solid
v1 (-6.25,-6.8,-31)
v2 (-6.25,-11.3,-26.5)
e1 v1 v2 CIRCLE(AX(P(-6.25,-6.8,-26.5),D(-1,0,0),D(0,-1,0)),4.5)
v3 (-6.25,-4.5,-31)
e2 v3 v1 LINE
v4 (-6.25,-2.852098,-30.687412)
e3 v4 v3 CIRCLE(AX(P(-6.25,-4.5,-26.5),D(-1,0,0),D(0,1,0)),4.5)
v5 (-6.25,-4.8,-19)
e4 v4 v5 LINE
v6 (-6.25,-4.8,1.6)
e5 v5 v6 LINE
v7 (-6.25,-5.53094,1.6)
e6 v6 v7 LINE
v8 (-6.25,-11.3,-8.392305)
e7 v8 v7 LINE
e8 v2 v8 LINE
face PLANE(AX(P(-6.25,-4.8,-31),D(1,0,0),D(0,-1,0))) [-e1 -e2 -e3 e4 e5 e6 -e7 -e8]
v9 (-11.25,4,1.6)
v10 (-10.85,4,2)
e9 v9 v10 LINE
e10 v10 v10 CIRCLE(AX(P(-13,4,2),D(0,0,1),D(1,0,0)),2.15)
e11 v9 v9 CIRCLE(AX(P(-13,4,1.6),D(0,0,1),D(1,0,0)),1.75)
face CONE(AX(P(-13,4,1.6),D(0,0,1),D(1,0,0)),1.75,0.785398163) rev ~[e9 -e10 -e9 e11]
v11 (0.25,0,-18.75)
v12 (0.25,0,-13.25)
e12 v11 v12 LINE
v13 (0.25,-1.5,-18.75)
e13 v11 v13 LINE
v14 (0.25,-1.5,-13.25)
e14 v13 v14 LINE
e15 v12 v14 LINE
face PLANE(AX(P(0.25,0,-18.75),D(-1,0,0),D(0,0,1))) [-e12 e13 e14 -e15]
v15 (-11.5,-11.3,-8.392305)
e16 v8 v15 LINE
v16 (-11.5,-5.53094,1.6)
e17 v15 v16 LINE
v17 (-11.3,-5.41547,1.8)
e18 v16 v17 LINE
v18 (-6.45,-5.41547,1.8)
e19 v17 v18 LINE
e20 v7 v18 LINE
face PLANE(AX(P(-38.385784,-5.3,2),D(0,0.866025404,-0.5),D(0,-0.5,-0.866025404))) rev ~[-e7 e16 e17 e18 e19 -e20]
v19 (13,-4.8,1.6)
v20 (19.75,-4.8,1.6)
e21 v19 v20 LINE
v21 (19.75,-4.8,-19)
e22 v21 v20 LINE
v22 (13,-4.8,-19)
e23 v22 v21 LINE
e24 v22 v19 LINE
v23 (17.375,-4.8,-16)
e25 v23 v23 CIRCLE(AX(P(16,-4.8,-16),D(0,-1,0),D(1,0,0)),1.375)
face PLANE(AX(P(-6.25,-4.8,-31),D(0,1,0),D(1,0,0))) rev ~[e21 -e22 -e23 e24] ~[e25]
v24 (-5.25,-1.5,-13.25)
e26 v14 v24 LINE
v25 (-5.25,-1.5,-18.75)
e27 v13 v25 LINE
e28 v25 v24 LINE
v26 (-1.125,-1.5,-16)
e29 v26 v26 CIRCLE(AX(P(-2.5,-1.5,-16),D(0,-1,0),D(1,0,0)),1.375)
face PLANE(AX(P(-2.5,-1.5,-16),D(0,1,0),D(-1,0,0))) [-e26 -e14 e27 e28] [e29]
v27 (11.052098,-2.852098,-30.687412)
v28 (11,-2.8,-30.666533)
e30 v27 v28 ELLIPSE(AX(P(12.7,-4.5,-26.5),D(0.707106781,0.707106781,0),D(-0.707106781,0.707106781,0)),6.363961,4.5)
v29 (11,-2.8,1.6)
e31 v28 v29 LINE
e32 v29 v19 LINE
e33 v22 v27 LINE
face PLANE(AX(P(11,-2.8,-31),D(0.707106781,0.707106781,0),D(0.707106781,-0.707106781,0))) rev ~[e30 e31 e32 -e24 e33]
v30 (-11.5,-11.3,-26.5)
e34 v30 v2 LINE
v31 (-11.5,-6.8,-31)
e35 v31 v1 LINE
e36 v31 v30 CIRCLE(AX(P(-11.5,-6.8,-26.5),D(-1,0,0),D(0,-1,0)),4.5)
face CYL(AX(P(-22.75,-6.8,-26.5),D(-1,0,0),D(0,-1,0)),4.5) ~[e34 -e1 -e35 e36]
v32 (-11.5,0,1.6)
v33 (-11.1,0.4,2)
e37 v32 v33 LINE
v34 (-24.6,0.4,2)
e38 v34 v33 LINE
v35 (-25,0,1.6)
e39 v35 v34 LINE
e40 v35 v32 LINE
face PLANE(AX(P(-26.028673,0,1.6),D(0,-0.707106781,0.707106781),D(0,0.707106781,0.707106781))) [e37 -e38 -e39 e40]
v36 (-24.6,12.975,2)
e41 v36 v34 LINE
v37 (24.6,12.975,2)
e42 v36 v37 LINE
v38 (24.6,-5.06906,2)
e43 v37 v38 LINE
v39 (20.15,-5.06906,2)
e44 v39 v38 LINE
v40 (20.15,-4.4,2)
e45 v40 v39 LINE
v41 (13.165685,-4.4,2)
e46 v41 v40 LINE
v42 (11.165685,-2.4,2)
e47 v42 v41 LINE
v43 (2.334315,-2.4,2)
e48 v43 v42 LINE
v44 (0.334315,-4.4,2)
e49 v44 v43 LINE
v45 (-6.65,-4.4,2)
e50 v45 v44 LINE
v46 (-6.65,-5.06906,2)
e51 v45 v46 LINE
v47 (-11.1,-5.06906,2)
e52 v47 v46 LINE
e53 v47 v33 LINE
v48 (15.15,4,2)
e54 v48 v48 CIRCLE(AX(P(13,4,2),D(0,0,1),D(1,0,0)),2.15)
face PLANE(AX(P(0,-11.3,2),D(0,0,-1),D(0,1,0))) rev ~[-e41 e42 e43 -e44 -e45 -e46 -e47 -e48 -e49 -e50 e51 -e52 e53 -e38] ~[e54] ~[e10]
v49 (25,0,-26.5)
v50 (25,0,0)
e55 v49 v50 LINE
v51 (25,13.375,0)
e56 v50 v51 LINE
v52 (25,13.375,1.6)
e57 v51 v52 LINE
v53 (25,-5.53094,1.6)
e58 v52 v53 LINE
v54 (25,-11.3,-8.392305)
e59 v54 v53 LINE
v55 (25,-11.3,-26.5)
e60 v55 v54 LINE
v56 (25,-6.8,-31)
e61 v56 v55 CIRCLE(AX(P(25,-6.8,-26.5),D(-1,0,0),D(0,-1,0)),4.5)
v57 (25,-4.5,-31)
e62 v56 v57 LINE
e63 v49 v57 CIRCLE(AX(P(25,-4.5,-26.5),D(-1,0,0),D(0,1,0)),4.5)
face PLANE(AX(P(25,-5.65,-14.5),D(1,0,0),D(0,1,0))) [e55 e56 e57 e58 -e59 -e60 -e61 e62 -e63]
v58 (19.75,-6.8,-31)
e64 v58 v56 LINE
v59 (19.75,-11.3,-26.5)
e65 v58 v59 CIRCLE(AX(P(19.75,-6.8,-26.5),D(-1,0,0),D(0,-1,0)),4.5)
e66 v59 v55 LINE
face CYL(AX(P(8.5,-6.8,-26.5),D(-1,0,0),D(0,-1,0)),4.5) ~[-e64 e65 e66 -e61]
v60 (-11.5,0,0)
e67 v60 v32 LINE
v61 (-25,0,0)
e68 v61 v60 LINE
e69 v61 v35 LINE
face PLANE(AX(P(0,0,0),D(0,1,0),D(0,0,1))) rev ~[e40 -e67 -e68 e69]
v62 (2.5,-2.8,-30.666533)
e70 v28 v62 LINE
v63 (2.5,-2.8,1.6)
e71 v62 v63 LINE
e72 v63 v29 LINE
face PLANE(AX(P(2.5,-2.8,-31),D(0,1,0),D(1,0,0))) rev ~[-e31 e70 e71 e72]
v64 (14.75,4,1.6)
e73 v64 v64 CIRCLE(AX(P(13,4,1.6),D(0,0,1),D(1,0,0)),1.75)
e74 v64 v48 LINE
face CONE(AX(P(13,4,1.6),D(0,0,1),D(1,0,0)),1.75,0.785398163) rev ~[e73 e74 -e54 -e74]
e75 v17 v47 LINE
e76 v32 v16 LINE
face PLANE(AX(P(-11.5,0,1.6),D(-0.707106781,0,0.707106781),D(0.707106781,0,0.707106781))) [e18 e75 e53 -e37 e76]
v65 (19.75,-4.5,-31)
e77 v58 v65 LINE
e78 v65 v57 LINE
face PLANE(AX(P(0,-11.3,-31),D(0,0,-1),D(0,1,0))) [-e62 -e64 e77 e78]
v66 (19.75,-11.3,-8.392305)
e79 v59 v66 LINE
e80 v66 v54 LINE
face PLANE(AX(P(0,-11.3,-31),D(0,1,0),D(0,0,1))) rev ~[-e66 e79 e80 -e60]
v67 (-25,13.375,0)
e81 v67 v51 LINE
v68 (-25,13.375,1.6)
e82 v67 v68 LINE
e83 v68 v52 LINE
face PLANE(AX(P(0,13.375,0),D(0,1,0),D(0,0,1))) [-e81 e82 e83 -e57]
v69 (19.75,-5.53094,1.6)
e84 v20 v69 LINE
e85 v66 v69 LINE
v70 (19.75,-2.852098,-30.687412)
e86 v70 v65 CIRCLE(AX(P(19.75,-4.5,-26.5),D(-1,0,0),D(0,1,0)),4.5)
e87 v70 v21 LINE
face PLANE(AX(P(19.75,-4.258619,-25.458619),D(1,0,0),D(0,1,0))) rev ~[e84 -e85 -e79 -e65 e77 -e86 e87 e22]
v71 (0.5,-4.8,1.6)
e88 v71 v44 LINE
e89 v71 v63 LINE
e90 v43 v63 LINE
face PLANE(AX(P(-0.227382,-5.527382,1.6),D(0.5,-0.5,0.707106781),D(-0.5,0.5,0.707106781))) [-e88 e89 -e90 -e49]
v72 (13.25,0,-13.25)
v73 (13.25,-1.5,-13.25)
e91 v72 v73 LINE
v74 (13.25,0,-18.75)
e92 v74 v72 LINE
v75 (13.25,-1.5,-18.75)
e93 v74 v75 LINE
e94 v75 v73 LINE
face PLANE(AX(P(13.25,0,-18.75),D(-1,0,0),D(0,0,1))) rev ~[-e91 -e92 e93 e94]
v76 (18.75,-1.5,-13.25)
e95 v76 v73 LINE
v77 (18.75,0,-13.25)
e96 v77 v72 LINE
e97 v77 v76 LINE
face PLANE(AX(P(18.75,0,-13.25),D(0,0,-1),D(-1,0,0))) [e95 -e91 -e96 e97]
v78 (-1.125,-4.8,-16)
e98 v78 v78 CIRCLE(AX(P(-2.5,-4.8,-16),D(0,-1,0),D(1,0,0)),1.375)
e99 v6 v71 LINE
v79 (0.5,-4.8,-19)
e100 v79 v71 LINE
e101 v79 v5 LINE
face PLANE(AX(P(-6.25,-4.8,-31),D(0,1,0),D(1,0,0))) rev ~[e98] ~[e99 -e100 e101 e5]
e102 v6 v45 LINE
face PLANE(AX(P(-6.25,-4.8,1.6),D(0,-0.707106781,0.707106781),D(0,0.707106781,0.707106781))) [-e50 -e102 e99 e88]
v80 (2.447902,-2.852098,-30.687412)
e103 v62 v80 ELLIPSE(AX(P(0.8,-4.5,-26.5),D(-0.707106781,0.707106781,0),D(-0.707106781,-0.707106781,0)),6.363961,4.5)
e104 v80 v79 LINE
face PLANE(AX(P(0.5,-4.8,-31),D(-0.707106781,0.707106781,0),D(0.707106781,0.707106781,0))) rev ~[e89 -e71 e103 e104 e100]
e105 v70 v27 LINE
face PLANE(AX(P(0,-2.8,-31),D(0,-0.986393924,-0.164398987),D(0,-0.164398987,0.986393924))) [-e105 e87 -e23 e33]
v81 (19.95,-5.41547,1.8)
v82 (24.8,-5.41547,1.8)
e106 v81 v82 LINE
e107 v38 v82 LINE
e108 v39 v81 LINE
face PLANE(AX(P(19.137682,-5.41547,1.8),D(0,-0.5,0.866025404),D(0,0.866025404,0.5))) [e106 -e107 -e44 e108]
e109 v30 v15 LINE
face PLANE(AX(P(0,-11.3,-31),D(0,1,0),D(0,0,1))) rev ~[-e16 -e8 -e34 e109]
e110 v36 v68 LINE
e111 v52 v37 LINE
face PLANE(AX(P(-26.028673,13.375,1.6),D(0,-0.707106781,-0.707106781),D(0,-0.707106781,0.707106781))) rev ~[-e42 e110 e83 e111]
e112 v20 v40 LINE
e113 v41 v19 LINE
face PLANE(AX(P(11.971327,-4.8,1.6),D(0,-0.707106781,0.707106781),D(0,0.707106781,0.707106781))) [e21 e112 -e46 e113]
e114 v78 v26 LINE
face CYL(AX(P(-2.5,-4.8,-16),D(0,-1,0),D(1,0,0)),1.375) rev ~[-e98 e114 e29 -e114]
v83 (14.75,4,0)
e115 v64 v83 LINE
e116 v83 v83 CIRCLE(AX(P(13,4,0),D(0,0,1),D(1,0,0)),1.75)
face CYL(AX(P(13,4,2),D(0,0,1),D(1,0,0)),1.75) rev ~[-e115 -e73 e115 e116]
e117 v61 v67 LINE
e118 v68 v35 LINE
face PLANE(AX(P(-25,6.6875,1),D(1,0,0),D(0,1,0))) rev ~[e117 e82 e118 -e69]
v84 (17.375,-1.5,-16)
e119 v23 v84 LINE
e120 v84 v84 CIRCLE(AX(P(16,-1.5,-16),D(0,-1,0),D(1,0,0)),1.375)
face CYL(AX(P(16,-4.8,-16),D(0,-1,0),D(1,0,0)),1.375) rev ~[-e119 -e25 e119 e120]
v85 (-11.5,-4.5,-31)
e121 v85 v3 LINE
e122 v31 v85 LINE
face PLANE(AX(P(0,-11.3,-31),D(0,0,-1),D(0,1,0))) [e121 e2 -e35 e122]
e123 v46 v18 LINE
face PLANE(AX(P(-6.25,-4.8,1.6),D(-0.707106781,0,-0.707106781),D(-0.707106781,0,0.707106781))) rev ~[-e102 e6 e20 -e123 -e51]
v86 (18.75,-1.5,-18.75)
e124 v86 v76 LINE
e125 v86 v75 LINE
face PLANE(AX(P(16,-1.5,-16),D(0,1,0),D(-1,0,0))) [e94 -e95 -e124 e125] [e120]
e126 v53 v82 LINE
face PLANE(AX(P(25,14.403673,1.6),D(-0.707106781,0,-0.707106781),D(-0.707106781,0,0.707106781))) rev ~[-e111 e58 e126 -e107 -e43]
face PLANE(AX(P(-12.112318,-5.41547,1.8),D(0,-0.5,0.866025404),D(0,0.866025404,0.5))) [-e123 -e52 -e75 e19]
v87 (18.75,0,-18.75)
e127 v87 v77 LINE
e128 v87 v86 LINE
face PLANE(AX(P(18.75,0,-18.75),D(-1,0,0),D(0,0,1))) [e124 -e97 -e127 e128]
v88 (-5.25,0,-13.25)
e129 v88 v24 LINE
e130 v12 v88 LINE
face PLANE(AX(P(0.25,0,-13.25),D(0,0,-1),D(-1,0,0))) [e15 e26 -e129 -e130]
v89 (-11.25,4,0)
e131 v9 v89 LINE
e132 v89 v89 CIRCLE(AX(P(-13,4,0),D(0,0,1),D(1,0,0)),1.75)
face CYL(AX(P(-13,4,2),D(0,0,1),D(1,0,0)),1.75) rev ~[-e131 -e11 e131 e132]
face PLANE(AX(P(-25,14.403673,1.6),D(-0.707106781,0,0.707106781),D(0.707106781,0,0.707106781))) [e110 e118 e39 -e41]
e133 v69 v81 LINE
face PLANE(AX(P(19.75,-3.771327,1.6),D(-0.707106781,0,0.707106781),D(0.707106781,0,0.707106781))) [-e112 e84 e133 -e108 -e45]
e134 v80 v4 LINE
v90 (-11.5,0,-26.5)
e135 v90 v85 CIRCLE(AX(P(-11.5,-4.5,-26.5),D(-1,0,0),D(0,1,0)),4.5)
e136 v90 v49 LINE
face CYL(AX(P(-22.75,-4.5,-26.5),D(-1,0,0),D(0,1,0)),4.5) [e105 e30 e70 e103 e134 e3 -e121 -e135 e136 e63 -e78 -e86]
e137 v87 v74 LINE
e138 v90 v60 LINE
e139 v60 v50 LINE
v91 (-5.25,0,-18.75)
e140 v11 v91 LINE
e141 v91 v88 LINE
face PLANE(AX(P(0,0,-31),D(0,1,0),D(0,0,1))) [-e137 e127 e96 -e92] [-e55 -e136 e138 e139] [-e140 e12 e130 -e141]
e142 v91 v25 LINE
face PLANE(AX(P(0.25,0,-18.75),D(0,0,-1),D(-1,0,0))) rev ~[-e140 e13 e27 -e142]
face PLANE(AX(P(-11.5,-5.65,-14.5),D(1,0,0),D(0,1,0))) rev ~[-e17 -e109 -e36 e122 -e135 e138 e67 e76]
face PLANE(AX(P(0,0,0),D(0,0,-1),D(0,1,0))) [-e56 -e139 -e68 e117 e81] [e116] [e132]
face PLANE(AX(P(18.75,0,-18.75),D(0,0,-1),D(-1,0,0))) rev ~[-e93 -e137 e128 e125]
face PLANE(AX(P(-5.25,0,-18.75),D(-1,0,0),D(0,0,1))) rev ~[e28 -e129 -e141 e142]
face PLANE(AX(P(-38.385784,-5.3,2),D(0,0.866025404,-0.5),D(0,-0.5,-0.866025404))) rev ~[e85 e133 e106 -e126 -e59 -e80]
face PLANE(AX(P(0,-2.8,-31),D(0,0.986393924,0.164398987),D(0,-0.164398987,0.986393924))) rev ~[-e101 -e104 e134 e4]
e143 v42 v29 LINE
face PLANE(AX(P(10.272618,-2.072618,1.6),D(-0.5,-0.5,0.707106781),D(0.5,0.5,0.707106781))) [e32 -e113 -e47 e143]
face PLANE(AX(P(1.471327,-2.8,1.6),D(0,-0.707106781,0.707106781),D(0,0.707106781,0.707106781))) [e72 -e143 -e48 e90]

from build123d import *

# Parameters (mm, degrees)
F0_W           = 13.375
F0_H           = 2
F1_DEPTH       = 25
F2_R           = 1.75
F3_DEPTH       = 2
F4_W           = 11.3
F4_H           = 33
F5_DEPTH       = 25
F5_DEPTH_BACK  = 11.5
F6_W           = 26
F6_H           = 6.5
F7_DEPTH       = 33
F9_DEPTH       = 33
F11_DEPTH      = 19.75
F11_DEPTH_BACK = 6.25
F12_R          = 1.375
F13_DEPTH      = 4.8
F14_W          = 5.5
F14_H          = 5.5
F15_DEPTH      = 1.5
F16_T1_DEPTH   = 27.75
F16_T3_DEPTH   = 27.75
F16_T5_DEPTH   = 59
F17_T1_DEPTH   = 59.021567647
F17_T3_DEPTH   = 59.021567647
F18_T1_DEPTH   = 6.4746360003
F18_T3_DEPTH   = 20.7323463904
F18_T5_DEPTH   = 52.0573463904
F18_T7_DEPTH   = 15.4323463904
F18_T9_DEPTH   = 14.5286731952
F18_T11_DEPTH  = 6.3286731952
F18_T13_DEPTH  = 6.4746360003
F18_T15_DEPTH  = 1.5286731952
F18_T17_DEPTH  = 7.7786731952
F18_T19_DEPTH  = 7.7786731952
F18_T24_DEPTH  = 4.8857735151
F18_T29_DEPTH  = 10.5573463904
F18_T35_DEPTH  = 4.8857735151
F18_T45_DEPTH  = 14.5286731952
F18_T49_DEPTH  = 7.3573463904
F18_T56_DEPTH  = 8.8073463904
F18_T60_DEPTH  = 2.5573463904
F18_T67_DEPTH  = 4.8857735151
F18_T71_DEPTH  = 10.5573463904
F18_T78_DEPTH  = 10.5573463904
F18_T82_DEPTH  = 4.8857735151
F18_T89_DEPTH  = 2.5573463904
F18_T93_DEPTH  = 8.8073463904


# Not quite as in the source:
# - a fillet or chamfer that OpenCascade refuses, or shapes differently, is made with other operations: its cross-section is extruded or revolved along the edge and cut away or added


with BuildPart() as f1:
    # F0 (on Right) → F1 (new body, symmetric)
    with BuildSketch(Plane.YZ):
        with Locations((6.6875, 1)):
            Rectangle(F0_W, F0_H)
    extrude(amount=F1_DEPTH, both=True)

    # F2 (on face) → F3 (cut, through all)
    with BuildSketch(Plane.XY.offset(2)):
        with Locations((-13, 4)):
            Circle(F2_R)
        with Locations((13, 4)):
            Circle(F2_R)
    extrude(amount=-F3_DEPTH, mode=Mode.SUBTRACT)

    # F4 (on Right) → F5 (join, two sides)
    with BuildSketch(Plane.YZ) as f5_sk:
        with Locations((-5.65, -14.5)):
            Rectangle(F4_W, F4_H)
    extrude(amount=F5_DEPTH)
    extrude(f5_sk.sketch, amount=-F5_DEPTH_BACK)

    # F6 (on face) → F7 (cut, through all)
    with BuildSketch(Plane(origin=(0, 0, -31), x_dir=(1, 0, 0), z_dir=(0, 0, -1))):
        with Locations((6.75, 8.05)):
            Rectangle(F6_W, F6_H)
    extrude(amount=-F7_DEPTH, mode=Mode.SUBTRACT)

    # F8 (on face) → F9 (cut, through all)
    with BuildSketch(Plane(origin=(0, 0, -31), x_dir=(1, 0, 0), z_dir=(0, 0, -1))):
        Polygon((13, 4.8), (0.5, 4.8), (2.5, 2.8), (11, 2.8), align=None)
    extrude(amount=-F9_DEPTH, mode=Mode.SUBTRACT)

    # F10 (on Right) → F11 (cut, two sides)
    with BuildSketch(Plane.YZ) as f11_sk:
        Polygon((-4.8, -31), (-2.8, -31), (-4.8, -19), align=None)
    extrude(amount=F11_DEPTH, mode=Mode.SUBTRACT)
    extrude(f11_sk.sketch, amount=-F11_DEPTH_BACK, mode=Mode.SUBTRACT)

    # F12 (on face) → F13 (cut, through all)
    with BuildSketch(Plane.XZ.offset(4.8)):
        with Locations((-2.5, -16)):
            Circle(F12_R)
        with Locations((16, -16)):
            Circle(F12_R)
    extrude(amount=-F13_DEPTH, mode=Mode.SUBTRACT)

    # F14 (on face) → F15 (cut)
    with BuildSketch(Plane(origin=(0, 0, 0), x_dir=(-1, 0, 0), z_dir=(0, 1, 0))):
        with Locations((-16, -16)):
            Rectangle(F14_W, F14_H)
        with Locations((2.5, -16)):
            Rectangle(F14_W, F14_H)
    extrude(amount=-F15_DEPTH, mode=Mode.SUBTRACT)

    # F16: fillet of radius 4.5 on 3 edges, made by hand

    # F16_s2 → F16_t1 (cut)
    with BuildSketch(Plane.YZ.offset(-22.75)):
        with BuildLine():
            ThreePointArc((-11.3, -26.5), (-9.9819805153, -29.6819805153), (-6.8, -31))
            Line((-6.8, -31), (-11.3, -31))
            Line((-11.3, -31), (-11.3, -26.5))
        make_face()
    extrude(amount=F16_T1_DEPTH, mode=Mode.SUBTRACT)

    # F16_s4 → F16_t3 (cut)
    with BuildSketch(Plane.YZ.offset(8.5)):
        with BuildLine():
            ThreePointArc((-11.3, -26.5), (-9.9819805153, -29.6819805153), (-6.8, -31))
            Line((-6.8, -31), (-11.3, -31))
            Line((-11.3, -31), (-11.3, -26.5))
        make_face()
    extrude(amount=F16_T3_DEPTH, mode=Mode.SUBTRACT)

    # F16_s6 → F16_t5 (cut)
    with BuildSketch(Plane.YZ.offset(-22.75)):
        with BuildLine():
            ThreePointArc((0, -26.5), (-1.3180194847, -29.6819805153), (-4.5, -31))
            Line((-4.5, -31), (0, -31))
            Line((0, -31), (0, -26.5))
        make_face()
    extrude(amount=F16_T5_DEPTH, mode=Mode.SUBTRACT)

    # F17: chamfer of 6 x 10.3923048454 on 2 edges, made by hand

    # F17_s2 → F17_t1 (cut)
    with BuildSketch(Plane.YZ.offset(-38.3857838235)):
        Polygon((-5.3, 2), (-11.3, -8.3923048454), (-11.3, 2), align=None)
    extrude(amount=F17_T1_DEPTH, mode=Mode.SUBTRACT)

    # F17_s4 → F17_t3 (cut)
    with BuildSketch(Plane.YZ.offset(-7.1357838235)):
        Polygon((-5.3, 2), (-11.3, -8.3923048454), (-11.3, 2), align=None)
    extrude(amount=F17_T3_DEPTH, mode=Mode.SUBTRACT)

    # F18: chamfer of 0.4 on 16 edges, made by hand

    # F18_s2 → F18_t1 (cut)
    with BuildSketch(Plane.YZ.offset(19.1376819998)):
        Polygon((-5.4154700538, 1.8), (-5.0690598923, 2), (-5.3, 2), align=None)
    extrude(amount=F18_T1_DEPTH, mode=Mode.SUBTRACT)

    # F18_s4 → F18_t3 (cut)
    with BuildSketch(Plane.XZ.offset(-14.4036731952)):
        Polygon((25, 1.6), (24.6, 2), (25, 2), align=None)
    extrude(amount=F18_T3_DEPTH, mode=Mode.SUBTRACT)

    # F18_s6 → F18_t5 (cut)
    with BuildSketch(Plane.YZ.offset(-26.0286731952)):
        Polygon((13.375, 1.6), (12.975, 2), (13.375, 2), align=None)
    extrude(amount=F18_T5_DEPTH, mode=Mode.SUBTRACT)

    # F18_s8 → F18_t7 (cut)
    with BuildSketch(Plane.XZ.offset(-14.4036731952)):
        Polygon((-25, 1.6), (-24.6, 2), (-25, 2), align=None)
    extrude(amount=F18_T7_DEPTH, mode=Mode.SUBTRACT)

    # F18_s10 → F18_t9 (cut)
    with BuildSketch(Plane.YZ.offset(-26.0286731952)):
        Polygon((0, 1.6), (0.4, 2), (0, 2), align=None)
    extrude(amount=F18_T9_DEPTH, mode=Mode.SUBTRACT)

    # F18_s12 → F18_t11 (cut)
    with BuildSketch(Plane.XZ):
        Polygon((-11.5, 1.6), (-11.1, 2), (-11.5, 2), align=None)
    extrude(amount=F18_T11_DEPTH, mode=Mode.SUBTRACT)

    # F18_s14 → F18_t13 (cut)
    with BuildSketch(Plane.YZ.offset(-12.1123180002)):
        Polygon((-5.4154700538, 1.8), (-5.0690598923, 2), (-5.3, 2), align=None)
    extrude(amount=F18_T13_DEPTH, mode=Mode.SUBTRACT)

    # F18_s16 → F18_t15 (cut)
    with BuildSketch(Plane.XZ.offset(4.8)):
        Polygon((-6.25, 1.6), (-6.65, 2), (-6.25, 2), align=None)
        Polygon((19.75, 1.6), (20.15, 2), (19.75, 2), align=None)
    extrude(amount=F18_T15_DEPTH, mode=Mode.SUBTRACT)

    # F18_s18 → F18_t17 (cut)
    with BuildSketch(Plane.YZ.offset(-6.25)):
        Polygon((-4.8, 1.6), (-4.4, 2), (-4.8, 2), align=None)
    extrude(amount=F18_T17_DEPTH, mode=Mode.SUBTRACT)

    # F18_s20 → F18_t19 (cut)
    with BuildSketch(Plane.YZ.offset(11.9713268048)):
        Polygon((-4.8, 1.6), (-4.4, 2), (-4.8, 2), align=None)
    extrude(amount=F18_T19_DEPTH, mode=Mode.SUBTRACT)


with BuildPart() as f18_tool22:
    # F18_s23 → F18_t24 (new body)
    with BuildSketch(Plane(origin=(-2.8773817919, -2.8773817919, 0), x_dir=(0, 0, 1), z_dir=(0.7071067812, 0.7071067812, 0))):
        Polygon((1.6, 3.7476659403), (2, 3.3476659403), (2, 3.7476659403), align=None)
    extrude(amount=F18_T24_DEPTH)

    split(bisect_by=Plane.XZ.offset(2.8), keep=Keep.TOP)


with BuildPart() as f1_1:
    add(f1.part)

    # F18_t21: cut F18_tool22
    add(f18_tool22.part, mode=Mode.SUBTRACT)


with BuildPart() as f18_tool27:
    # F18_s28 → F18_t29 (new body)
    with BuildSketch(Plane.YZ.offset(1.4713268048)):
        Polygon((-2.8, 1.6), (-2.4, 2), (-2.8, 2), align=None)
    extrude(amount=F18_T29_DEPTH)

    split(bisect_by=Plane(origin=(2.65, -2.65, 0), x_dir=(0, 0, 1), z_dir=(0.7071067812, -0.7071067812, 0)), keep=Keep.TOP)

    split(bisect_by=Plane(origin=(4.1, 4.1, 0), x_dir=(0, 0, 1), z_dir=(-0.7071067812, -0.7071067812, 0)), keep=Keep.TOP)


with BuildPart() as f1_2:
    add(f1_1.part)

    # F18_t26: cut F18_tool27
    add(f18_tool27.part, mode=Mode.SUBTRACT)


with BuildPart() as f18_tool33:
    # F18_s34 → F18_t35 (new body)
    with BuildSketch(Plane(origin=(6.1726182081, -6.1726182081, 0), x_dir=(0, 0, 1), z_dir=(0.7071067812, -0.7071067812, 0))):
        Polygon((1.6, -5.7982756057), (2, -6.1982756057), (2, -5.7982756057), align=None)
    extrude(amount=F18_T35_DEPTH)

    split(bisect_by=Plane.XZ.offset(2.8), keep=Keep.TOP)


with BuildPart() as f1_3:
    add(f1_2.part)

    # F18_t32: cut F18_tool33
    add(f18_tool33.part, mode=Mode.SUBTRACT)

    # F18_s37 → F18_t38 (revolve, cut)
    with BuildSketch(Plane.XZ.offset(-4)):
        Polygon((-11.25, 1.6), (-10.85, 2), (-11.25, 2), align=None)
    revolve(axis=Axis((-13, 4, 2), (0, 0, 1)), mode=Mode.SUBTRACT)

    # F18_s39 → F18_t40 (revolve, cut)
    with BuildSketch(Plane.XZ.offset(-4)):
        Polygon((14.75, 1.6), (15.15, 2), (14.75, 2), align=None)
    revolve(axis=Axis((13, 4, 2), (0, 0, 1)), mode=Mode.SUBTRACT)


with BuildPart() as f18_tool43:
    # F18_s44 → F18_t45 (new body)
    with BuildSketch(Plane.YZ.offset(-10.4713268048)):
        Polygon((0, 1.6), (0.4, 2), (0, 2), align=None)
    extrude(amount=-F18_T45_DEPTH)

    split(bisect_by=Plane.YZ.offset(-11.5), keep=Keep.TOP)


with BuildPart() as f18_tool47:
    # F18_s48 → F18_t49 (new body)
    with BuildSketch(Plane.XZ.offset(-1.0286731952)):
        Polygon((-11.5, 1.6), (-11.1, 2), (-11.5, 2), align=None)
    extrude(amount=F18_T49_DEPTH)

    split(bisect_by=Plane.XZ, keep=Keep.BOTTOM)


with BuildPart() as f18_tool43_1:
    add(f18_tool43.part)

    # F18_t51: intersect F18_tool47
    add(f18_tool47.part, mode=Mode.INTERSECT)


with BuildPart() as f1_4:
    add(f1_3.part)

    # F18_t41: cut F18_tool43
    add(f18_tool43_1.part, mode=Mode.SUBTRACT)


with BuildPart() as f18_tool54:
    # F18_s55 → F18_t56 (new body)
    with BuildSketch(Plane.YZ.offset(-7.2786731952)):
        Polygon((-4.8, 1.6), (-4.4, 2), (-4.8, 2), align=None)
    extrude(amount=F18_T56_DEPTH)

    split(bisect_by=Plane.YZ.offset(-6.25), keep=Keep.BOTTOM)


with BuildPart() as f18_tool58:
    # F18_s59 → F18_t60 (new body)
    with BuildSketch(Plane.XZ.offset(6.3286731952)):
        Polygon((-6.25, 1.6), (-6.65, 2), (-6.25, 2), align=None)
    extrude(amount=-F18_T60_DEPTH)

    split(bisect_by=Plane.XZ.offset(4.8), keep=Keep.BOTTOM)


with BuildPart() as f18_tool54_1:
    add(f18_tool54.part)

    # F18_t62: intersect F18_tool58
    add(f18_tool58.part, mode=Mode.INTERSECT)


with BuildPart() as f1_5:
    add(f1_4.part)

    # F18_t52: cut F18_tool54
    add(f18_tool54_1.part, mode=Mode.SUBTRACT)


with BuildPart() as f18_tool65:
    # F18_s66 → F18_t67 (new body)
    with BuildSketch(Plane(origin=(-2.8773817919, -2.8773817919, 0), x_dir=(0, 0, 1), z_dir=(0.7071067812, 0.7071067812, 0))):
        Polygon((1.6, 3.7476659403), (2, 3.3476659403), (2, 3.7476659403), align=None)
    extrude(amount=F18_T67_DEPTH)

    split(bisect_by=Plane.XZ.offset(2.8), keep=Keep.BOTTOM)


with BuildPart() as f18_tool69:
    # F18_s70 → F18_t71 (new body)
    with BuildSketch(Plane.YZ.offset(1.4713268048)):
        Polygon((-2.8, 1.6), (-2.4, 2), (-2.8, 2), align=None)
    extrude(amount=F18_T71_DEPTH)

    split(bisect_by=Plane(origin=(2.65, -2.65, 0), x_dir=(0, 0, 1), z_dir=(-0.7071067812, 0.7071067812, 0)), keep=Keep.TOP)


with BuildPart() as f18_tool65_1:
    add(f18_tool65.part)

    # F18_t73: intersect F18_tool69
    add(f18_tool69.part, mode=Mode.INTERSECT)


with BuildPart() as f1_6:
    add(f1_5.part)

    # F18_t63: cut F18_tool65
    add(f18_tool65_1.part, mode=Mode.SUBTRACT)


with BuildPart() as f18_tool76:
    # F18_s77 → F18_t78 (new body)
    with BuildSketch(Plane.YZ.offset(1.4713268048)):
        Polygon((-2.8, 1.6), (-2.4, 2), (-2.8, 2), align=None)
    extrude(amount=F18_T78_DEPTH)

    split(bisect_by=Plane(origin=(4.1, 4.1, 0), x_dir=(0, 0, 1), z_dir=(0.7071067812, 0.7071067812, 0)), keep=Keep.TOP)


with BuildPart() as f18_tool80:
    # F18_s81 → F18_t82 (new body)
    with BuildSketch(Plane(origin=(6.1726182081, -6.1726182081, 0), x_dir=(0, 0, 1), z_dir=(0.7071067812, -0.7071067812, 0))):
        Polygon((1.6, -5.7982756057), (2, -6.1982756057), (2, -5.7982756057), align=None)
    extrude(amount=F18_T82_DEPTH)

    split(bisect_by=Plane.XZ.offset(2.8), keep=Keep.BOTTOM)


with BuildPart() as f18_tool76_1:
    add(f18_tool76.part)

    # F18_t84: intersect F18_tool80
    add(f18_tool80.part, mode=Mode.INTERSECT)


with BuildPart() as f1_7:
    add(f1_6.part)

    # F18_t74: cut F18_tool76
    add(f18_tool76_1.part, mode=Mode.SUBTRACT)


with BuildPart() as f18_tool87:
    # F18_s88 → F18_t89 (new body)
    with BuildSketch(Plane.XZ.offset(3.7713268048)):
        Polygon((19.75, 1.6), (20.15, 2), (19.75, 2), align=None)
    extrude(amount=F18_T89_DEPTH)

    split(bisect_by=Plane.XZ.offset(4.8), keep=Keep.BOTTOM)


with BuildPart() as f18_tool91:
    # F18_s92 → F18_t93 (new body)
    with BuildSketch(Plane.YZ.offset(11.9713268048)):
        Polygon((-4.8, 1.6), (-4.4, 2), (-4.8, 2), align=None)
    extrude(amount=F18_T93_DEPTH)

    split(bisect_by=Plane.YZ.offset(19.75), keep=Keep.TOP)


with BuildPart() as f18_tool87_1:
    add(f18_tool87.part)

    # F18_t95: intersect F18_tool91
    add(f18_tool91.part, mode=Mode.INTERSECT)


with BuildPart() as f1_8:
    add(f1_7.part)

    # F18_t85: cut F18_tool87
    add(f18_tool87_1.part, mode=Mode.SUBTRACT)


solid = f1_8.part
